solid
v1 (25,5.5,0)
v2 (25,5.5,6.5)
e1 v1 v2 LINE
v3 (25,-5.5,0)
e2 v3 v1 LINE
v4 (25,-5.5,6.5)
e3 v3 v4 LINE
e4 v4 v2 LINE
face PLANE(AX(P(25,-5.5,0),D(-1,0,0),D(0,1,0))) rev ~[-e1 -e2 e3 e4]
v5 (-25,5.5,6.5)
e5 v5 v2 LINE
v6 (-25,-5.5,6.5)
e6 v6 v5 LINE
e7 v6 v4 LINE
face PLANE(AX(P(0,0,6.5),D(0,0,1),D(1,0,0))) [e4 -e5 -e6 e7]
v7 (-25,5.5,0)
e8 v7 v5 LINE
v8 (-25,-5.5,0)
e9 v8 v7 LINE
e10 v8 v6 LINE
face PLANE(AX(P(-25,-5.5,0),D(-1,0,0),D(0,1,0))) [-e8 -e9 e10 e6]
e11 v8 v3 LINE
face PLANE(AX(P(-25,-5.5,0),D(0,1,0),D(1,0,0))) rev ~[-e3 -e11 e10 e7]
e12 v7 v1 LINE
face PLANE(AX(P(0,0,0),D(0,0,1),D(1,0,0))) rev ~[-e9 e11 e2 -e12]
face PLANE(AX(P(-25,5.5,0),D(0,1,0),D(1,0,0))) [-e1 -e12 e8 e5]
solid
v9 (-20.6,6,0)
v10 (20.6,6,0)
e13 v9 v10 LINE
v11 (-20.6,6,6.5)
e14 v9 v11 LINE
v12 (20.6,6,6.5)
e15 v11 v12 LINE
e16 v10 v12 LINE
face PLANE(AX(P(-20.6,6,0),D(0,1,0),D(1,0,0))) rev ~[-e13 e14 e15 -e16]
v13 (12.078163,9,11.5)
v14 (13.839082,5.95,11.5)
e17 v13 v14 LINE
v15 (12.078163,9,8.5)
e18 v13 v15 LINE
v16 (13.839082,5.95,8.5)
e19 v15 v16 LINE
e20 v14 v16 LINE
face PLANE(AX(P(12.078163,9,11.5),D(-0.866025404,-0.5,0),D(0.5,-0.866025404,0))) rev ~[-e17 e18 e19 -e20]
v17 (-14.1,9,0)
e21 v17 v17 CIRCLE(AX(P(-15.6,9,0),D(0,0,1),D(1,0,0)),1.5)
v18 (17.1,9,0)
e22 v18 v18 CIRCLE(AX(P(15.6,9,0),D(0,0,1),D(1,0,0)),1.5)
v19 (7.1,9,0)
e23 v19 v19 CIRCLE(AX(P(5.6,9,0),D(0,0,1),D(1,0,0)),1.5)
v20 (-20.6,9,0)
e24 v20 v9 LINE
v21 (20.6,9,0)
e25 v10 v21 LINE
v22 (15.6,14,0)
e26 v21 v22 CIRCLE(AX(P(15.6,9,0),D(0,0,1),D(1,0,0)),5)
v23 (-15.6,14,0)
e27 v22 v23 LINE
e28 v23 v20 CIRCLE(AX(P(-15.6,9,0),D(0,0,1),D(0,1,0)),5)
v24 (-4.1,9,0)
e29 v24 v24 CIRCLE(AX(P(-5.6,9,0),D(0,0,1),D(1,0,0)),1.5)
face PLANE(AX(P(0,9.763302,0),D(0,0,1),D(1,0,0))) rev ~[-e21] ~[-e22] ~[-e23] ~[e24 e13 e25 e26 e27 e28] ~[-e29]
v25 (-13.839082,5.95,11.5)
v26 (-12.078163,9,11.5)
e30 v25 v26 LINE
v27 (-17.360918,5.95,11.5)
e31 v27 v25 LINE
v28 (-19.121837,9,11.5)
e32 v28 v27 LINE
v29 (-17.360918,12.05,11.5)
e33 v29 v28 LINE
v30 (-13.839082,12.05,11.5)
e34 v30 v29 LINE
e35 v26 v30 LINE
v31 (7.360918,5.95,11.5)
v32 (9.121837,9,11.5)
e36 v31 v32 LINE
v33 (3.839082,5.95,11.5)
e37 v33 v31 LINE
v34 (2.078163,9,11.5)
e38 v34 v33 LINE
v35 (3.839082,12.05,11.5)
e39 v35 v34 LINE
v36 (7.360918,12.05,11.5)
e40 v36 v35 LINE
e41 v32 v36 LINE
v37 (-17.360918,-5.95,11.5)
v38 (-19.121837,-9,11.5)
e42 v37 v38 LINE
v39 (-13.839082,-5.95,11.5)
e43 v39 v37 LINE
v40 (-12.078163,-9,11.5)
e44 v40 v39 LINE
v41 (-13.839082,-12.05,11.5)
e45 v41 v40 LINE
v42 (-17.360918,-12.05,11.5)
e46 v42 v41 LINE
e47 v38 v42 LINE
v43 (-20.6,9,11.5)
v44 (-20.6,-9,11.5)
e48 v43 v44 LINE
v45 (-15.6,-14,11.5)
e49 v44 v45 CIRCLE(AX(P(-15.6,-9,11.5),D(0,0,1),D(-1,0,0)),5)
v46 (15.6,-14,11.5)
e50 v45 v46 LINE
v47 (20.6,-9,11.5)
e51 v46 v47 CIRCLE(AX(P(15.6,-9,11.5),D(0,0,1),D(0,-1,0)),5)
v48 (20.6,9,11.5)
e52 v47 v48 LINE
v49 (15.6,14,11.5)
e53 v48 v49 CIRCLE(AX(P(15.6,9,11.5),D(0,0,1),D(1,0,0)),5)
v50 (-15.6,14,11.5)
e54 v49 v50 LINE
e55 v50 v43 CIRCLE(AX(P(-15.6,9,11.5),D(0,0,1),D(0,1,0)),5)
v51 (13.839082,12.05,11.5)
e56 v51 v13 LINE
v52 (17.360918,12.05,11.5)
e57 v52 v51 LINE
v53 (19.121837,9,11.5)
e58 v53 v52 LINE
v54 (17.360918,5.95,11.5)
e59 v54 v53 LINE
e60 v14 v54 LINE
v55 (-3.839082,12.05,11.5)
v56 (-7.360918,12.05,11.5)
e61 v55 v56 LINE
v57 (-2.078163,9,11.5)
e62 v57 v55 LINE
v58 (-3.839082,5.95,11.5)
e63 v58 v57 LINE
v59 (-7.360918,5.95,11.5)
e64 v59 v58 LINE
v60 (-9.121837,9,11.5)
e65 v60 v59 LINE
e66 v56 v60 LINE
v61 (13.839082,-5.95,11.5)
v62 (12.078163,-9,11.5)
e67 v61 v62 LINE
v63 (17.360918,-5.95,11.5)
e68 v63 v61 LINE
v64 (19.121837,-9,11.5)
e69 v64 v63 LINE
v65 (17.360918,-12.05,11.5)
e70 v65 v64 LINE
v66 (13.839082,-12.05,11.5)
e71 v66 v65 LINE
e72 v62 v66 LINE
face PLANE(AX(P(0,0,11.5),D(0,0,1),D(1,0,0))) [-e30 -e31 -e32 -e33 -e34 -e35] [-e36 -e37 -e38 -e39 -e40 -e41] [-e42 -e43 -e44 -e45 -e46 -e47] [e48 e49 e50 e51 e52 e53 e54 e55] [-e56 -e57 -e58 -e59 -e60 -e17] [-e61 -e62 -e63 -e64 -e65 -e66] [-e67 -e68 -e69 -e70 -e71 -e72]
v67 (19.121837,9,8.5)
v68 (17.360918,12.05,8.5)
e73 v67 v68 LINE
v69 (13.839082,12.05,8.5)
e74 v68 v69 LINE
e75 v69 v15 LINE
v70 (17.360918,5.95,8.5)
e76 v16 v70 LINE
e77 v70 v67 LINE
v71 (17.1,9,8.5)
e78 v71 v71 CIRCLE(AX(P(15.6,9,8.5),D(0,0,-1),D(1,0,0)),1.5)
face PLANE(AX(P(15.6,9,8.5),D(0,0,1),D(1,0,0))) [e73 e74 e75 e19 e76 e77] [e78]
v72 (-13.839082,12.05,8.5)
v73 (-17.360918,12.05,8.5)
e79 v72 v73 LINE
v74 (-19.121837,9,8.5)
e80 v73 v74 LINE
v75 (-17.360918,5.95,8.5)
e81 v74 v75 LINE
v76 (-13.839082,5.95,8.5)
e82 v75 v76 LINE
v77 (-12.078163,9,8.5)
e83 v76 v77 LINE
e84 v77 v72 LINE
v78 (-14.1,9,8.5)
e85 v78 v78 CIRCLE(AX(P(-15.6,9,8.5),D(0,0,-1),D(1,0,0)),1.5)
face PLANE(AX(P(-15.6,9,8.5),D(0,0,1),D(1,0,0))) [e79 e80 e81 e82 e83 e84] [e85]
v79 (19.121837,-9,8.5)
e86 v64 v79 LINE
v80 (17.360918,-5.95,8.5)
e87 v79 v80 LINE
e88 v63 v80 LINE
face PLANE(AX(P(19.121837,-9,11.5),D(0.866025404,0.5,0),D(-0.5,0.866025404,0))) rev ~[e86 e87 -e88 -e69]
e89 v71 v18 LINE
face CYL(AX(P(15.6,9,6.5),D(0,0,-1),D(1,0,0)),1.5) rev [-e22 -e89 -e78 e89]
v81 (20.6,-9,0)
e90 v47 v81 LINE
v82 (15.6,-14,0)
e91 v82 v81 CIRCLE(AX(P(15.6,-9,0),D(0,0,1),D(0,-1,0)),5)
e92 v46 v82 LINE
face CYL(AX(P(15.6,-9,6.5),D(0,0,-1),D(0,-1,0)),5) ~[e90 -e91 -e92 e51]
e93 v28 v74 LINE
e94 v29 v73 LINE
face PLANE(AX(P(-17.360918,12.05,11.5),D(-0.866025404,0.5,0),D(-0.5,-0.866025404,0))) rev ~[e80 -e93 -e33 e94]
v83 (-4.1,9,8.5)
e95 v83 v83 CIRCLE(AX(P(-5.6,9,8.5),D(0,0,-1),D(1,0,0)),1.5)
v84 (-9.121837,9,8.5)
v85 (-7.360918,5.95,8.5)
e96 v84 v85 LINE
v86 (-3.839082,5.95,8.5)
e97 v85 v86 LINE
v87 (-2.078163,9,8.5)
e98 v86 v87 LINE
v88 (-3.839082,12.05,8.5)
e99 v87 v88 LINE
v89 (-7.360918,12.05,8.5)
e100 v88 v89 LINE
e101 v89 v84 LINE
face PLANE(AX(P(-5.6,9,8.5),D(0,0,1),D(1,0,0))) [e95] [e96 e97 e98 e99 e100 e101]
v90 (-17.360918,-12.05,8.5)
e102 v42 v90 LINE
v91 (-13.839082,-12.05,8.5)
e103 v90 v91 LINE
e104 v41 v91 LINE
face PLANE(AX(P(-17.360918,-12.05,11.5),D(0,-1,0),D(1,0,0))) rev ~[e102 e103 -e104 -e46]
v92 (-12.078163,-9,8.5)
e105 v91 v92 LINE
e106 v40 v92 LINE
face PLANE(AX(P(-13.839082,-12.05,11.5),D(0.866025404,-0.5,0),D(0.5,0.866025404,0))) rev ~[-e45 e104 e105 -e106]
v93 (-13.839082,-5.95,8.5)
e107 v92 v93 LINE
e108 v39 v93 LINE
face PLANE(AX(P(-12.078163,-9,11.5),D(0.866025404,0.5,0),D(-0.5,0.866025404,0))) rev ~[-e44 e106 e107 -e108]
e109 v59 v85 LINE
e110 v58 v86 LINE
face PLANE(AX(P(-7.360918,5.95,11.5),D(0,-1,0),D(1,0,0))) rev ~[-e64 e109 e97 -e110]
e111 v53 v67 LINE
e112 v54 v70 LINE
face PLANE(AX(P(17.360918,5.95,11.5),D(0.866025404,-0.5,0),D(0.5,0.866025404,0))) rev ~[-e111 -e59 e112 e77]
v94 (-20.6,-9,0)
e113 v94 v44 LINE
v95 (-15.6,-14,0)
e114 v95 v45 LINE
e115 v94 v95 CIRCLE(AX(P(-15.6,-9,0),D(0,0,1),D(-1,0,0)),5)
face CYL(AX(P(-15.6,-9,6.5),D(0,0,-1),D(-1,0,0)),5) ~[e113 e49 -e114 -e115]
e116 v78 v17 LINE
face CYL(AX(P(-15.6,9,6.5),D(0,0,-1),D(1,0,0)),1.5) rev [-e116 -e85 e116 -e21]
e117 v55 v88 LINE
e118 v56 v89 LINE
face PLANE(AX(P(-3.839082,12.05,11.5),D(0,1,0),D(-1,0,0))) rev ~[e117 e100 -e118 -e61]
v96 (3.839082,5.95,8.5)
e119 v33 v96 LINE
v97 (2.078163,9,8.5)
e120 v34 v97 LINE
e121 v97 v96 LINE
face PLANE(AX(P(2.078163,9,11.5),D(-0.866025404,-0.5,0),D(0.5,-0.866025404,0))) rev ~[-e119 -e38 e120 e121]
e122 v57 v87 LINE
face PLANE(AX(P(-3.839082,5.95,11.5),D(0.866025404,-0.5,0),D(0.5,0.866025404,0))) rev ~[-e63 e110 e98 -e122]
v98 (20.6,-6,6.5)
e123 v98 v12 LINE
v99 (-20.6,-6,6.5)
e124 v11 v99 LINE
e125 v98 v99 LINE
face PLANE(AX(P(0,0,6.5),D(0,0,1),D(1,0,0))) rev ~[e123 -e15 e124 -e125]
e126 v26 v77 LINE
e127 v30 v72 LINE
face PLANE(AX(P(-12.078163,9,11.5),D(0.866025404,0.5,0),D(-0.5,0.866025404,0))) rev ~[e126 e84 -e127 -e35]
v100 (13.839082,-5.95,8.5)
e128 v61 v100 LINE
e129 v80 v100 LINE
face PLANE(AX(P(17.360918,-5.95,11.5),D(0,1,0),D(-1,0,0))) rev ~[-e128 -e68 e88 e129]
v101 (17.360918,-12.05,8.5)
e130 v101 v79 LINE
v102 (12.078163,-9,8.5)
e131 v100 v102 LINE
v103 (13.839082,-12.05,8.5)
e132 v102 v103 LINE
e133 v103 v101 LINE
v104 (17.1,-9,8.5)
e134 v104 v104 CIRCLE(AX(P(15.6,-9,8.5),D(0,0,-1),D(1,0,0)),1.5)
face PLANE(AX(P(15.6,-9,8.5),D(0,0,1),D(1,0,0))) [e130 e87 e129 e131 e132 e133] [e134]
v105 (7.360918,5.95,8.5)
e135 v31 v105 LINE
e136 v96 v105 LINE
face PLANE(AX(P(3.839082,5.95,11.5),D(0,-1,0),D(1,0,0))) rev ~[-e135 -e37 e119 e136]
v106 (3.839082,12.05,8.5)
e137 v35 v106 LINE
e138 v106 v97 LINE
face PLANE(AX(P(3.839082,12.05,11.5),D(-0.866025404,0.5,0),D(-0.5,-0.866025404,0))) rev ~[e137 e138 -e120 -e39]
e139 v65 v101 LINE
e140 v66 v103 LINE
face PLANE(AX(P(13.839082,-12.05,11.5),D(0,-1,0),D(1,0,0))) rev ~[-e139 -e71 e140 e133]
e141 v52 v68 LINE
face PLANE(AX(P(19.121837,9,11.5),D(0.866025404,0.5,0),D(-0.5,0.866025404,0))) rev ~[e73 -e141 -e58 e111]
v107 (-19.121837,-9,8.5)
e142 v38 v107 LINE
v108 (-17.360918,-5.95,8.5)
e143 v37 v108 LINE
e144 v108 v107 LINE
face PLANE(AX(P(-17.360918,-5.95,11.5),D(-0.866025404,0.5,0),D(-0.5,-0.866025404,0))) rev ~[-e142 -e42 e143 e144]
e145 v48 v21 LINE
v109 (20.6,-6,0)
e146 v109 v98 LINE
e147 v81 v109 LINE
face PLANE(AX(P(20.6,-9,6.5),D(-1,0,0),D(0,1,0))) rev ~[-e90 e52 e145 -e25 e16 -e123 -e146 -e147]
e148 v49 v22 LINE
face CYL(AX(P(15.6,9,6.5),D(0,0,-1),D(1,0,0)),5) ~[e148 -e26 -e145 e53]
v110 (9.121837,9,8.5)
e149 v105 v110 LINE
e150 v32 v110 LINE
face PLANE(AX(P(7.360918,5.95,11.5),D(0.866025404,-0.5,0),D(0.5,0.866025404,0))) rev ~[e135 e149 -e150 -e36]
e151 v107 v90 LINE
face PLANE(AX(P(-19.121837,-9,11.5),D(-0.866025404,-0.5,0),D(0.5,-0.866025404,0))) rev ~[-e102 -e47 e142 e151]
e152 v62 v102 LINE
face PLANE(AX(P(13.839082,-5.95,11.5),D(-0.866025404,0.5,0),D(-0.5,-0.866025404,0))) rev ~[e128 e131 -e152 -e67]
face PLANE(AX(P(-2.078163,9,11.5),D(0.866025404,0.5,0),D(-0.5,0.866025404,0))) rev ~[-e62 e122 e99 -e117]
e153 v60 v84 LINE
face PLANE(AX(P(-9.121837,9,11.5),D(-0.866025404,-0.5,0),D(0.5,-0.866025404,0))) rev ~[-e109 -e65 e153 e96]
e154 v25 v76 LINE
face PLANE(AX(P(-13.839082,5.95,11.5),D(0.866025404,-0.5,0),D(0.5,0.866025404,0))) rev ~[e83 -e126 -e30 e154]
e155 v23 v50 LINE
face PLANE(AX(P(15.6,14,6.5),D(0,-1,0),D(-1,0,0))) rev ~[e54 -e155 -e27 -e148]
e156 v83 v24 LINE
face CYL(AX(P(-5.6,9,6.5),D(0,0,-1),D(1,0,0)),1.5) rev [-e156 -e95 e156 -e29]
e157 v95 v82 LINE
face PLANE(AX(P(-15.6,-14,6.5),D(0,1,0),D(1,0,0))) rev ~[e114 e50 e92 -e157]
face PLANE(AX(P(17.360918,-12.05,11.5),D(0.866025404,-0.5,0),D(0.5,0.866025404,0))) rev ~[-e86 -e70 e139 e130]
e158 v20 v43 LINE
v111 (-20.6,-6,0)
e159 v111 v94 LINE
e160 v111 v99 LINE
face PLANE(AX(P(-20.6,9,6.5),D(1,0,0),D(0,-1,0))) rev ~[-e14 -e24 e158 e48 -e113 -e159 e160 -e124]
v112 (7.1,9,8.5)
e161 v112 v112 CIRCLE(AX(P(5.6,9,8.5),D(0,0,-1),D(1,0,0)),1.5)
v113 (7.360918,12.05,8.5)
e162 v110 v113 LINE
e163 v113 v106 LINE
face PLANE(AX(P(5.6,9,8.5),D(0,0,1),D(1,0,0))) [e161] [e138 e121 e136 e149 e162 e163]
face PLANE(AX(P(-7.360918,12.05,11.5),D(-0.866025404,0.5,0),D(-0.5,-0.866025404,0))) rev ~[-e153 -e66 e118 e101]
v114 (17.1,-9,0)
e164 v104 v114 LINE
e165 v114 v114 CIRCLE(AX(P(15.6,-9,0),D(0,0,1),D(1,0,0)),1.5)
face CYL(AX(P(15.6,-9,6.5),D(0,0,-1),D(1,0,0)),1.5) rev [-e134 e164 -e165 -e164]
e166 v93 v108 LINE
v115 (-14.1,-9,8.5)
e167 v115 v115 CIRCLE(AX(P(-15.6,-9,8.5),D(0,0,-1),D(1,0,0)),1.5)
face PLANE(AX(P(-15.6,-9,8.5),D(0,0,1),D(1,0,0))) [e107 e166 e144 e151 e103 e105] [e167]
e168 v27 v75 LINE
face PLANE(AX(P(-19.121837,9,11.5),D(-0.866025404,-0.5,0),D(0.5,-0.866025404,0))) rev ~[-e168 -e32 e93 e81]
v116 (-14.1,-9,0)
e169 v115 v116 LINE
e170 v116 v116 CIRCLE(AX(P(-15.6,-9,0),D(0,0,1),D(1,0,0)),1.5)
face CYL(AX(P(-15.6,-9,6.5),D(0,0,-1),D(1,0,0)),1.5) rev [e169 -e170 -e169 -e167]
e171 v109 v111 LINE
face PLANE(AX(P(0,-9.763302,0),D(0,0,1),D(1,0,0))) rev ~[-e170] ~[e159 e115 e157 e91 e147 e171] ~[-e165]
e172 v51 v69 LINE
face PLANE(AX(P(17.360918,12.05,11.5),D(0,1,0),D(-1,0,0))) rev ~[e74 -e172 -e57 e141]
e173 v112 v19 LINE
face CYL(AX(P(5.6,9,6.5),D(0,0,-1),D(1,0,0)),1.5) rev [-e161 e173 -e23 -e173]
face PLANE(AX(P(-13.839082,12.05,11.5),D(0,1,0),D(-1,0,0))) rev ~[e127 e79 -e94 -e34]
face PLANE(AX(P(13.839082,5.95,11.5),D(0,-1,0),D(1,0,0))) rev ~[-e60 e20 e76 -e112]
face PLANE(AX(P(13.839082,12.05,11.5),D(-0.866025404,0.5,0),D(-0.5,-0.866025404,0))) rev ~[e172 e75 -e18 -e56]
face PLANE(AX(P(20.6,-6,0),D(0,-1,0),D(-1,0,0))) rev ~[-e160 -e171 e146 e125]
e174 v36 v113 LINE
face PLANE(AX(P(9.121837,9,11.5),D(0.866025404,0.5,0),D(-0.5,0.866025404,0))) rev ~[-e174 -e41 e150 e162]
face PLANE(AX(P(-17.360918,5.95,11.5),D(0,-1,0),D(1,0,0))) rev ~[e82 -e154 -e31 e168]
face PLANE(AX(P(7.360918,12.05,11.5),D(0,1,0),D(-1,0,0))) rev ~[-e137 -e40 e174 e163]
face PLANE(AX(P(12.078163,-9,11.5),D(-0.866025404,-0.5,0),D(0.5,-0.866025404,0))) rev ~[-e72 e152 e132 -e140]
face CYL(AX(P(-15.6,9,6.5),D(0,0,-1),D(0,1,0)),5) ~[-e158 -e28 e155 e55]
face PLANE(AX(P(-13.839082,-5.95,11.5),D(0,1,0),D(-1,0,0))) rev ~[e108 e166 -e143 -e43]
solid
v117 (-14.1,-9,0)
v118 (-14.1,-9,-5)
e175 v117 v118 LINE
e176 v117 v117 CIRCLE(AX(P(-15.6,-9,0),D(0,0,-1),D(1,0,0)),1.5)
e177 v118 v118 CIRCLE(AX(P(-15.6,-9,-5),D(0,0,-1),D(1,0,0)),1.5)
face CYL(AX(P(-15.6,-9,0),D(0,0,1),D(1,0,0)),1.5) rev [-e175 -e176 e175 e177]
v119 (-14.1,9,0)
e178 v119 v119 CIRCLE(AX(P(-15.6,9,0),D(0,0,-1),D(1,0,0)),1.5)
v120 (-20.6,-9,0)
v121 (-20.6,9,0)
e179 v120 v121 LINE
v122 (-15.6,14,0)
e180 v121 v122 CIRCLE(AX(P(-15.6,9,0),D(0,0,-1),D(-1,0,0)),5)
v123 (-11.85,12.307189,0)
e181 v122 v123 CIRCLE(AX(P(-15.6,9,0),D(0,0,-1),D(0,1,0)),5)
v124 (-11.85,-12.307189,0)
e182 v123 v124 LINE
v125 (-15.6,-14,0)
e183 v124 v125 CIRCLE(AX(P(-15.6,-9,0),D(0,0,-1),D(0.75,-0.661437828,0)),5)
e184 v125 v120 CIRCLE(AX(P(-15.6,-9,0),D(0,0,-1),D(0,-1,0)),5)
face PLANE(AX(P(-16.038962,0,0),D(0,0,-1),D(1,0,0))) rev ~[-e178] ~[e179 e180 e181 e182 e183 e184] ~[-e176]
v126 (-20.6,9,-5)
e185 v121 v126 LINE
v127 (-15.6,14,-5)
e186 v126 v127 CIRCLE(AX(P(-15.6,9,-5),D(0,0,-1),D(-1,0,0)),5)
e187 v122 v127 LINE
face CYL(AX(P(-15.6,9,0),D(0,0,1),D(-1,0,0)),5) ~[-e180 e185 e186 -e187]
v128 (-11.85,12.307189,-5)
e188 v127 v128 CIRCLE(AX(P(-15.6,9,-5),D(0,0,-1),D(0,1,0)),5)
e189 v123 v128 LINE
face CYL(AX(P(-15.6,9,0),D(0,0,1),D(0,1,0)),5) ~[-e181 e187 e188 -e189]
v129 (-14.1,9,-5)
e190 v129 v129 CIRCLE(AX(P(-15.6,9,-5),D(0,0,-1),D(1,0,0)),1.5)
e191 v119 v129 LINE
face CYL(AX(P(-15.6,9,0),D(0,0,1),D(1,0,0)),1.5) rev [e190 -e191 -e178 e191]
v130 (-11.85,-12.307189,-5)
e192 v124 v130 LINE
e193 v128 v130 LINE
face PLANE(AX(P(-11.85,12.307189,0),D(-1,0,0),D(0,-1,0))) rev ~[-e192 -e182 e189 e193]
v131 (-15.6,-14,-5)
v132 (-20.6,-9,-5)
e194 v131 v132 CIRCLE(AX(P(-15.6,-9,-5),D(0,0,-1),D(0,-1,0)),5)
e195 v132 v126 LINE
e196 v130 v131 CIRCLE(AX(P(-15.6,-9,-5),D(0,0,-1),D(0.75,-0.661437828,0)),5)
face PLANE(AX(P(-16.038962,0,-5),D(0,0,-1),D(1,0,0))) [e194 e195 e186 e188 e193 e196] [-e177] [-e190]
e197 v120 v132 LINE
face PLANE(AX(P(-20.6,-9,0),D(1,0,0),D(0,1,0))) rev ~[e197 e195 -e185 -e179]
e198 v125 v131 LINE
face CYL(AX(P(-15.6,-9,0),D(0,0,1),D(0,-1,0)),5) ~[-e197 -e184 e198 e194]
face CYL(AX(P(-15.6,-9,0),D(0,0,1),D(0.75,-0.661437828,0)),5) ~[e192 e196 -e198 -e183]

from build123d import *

# Parameters (mm, degrees)
F0_W     = 50
F0_H     = 11
F1_DEPTH = 6.5
F2_R     = 1.5
F3_DEPTH = 6.5
F4_R     = 1.5
F5_DEPTH = 5
F6_R     = 1.5
F7_DEPTH = 5
F9_DEPTH = 3


with BuildPart() as f1:
    # F0 (on Top) → F1 (new body)
    with BuildSketch(Plane.XY):
        Rectangle(F0_W, F0_H)
    extrude(amount=F1_DEPTH)


with BuildPart() as f3:
    # F2 (on Top) → F3 (new body)
    with BuildSketch(Plane.XY):
        with BuildLine():
            Line((15.6, 14), (0, 14))
            Line((0, 14), (-15.6, 14))
            ThreePointArc((-15.6, 14), (-19.1355339059, 12.5355339059), (-20.6, 9))
            Line((-20.6, 9), (-20.6, 6))
            Line((-20.6, 6), (0, 6))
            Line((0, 6), (20.6, 6))
            Line((20.6, 6), (20.6, 9))
            ThreePointArc((20.6, 9), (19.1355339059, 12.5355339059), (15.6, 14))
        make_face()
        with Locations((-15.6, 9)):
            Circle(F2_R, mode=Mode.SUBTRACT)
        with Locations((-5.6, 9)):
            Circle(F2_R, mode=Mode.SUBTRACT)
        with Locations((5.6, 9)):
            Circle(F2_R, mode=Mode.SUBTRACT)
        with Locations((15.6, 9)):
            Circle(F2_R, mode=Mode.SUBTRACT)
    extrude(amount=F3_DEPTH)



with BuildPart() as f3b:
    # F2 (on Top) → F3, piece 2 (new body)
    with BuildSketch(Plane.XY):
        with BuildLine():
            Line((0, -6), (-20.6, -6))
            Line((-20.6, -6), (-20.6, -9))
            ThreePointArc((-20.6, -9), (-19.1355339059, -12.5355339059), (-15.6, -14))
            Line((-15.6, -14), (0, -14))
            Line((0, -14), (15.6, -14))
            ThreePointArc((15.6, -14), (19.1355339059, -12.5355339059), (20.6, -9))
            Line((20.6, -9), (20.6, -6))
            Line((20.6, -6), (0, -6))
        make_face()
        with Locations((-15.6, -9)):
            Circle(F2_R, mode=Mode.SUBTRACT)
        with Locations((15.6, -9)):
            Circle(F2_R, mode=Mode.SUBTRACT)
    extrude(amount=F3_DEPTH)


with BuildPart() as f3_1:
    add(f3.part)

    add(f3b.part)  # F5 merges F3b
    # F4 (on face) → F5 (join)
    with BuildSketch(Plane.XY.offset(6.5)):
        with BuildLine():
            Line((15.6, 14), (0, 14))
            Line((0, 14), (-15.6, 14))
            ThreePointArc((-15.6, 14), (-19.1355339059, 12.5355339059), (-20.6, 9))
            Line((-20.6, 9), (-20.6, -9))
            ThreePointArc((-20.6, -9), (-19.1355339059, -12.5355339059), (-15.6, -14))
            Line((-15.6, -14), (0, -14))
            Line((0, -14), (15.6, -14))
            ThreePointArc((15.6, -14), (19.1355339059, -12.5355339059), (20.6, -9))
            Line((20.6, -9), (20.6, 9))
            ThreePointArc((20.6, 9), (19.1355339059, 12.5355339059), (15.6, 14))
        make_face()
        with Locations((-15.6, -9)):
            Circle(F4_R, mode=Mode.SUBTRACT)
        with Locations((15.6, -9)):
            Circle(F4_R, mode=Mode.SUBTRACT)
        with Locations((-15.6, 9)):
            Circle(F4_R, mode=Mode.SUBTRACT)
        with Locations((-5.6, 9)):
            Circle(F4_R, mode=Mode.SUBTRACT)
        with Locations((5.6, 9)):
            Circle(F4_R, mode=Mode.SUBTRACT)
        with Locations((15.6, 9)):
            Circle(F4_R, mode=Mode.SUBTRACT)
    extrude(amount=F5_DEPTH)

    # F8 (on face) → F9 (cut)
    with BuildSketch(Plane.XY.offset(11.5)):
        Polygon((-13.839081679, 12.05), (-17.360918321, 12.05), (-19.1218366421, 9), (-17.360918321, 5.95), (-13.839081679, 5.95), (-12.0781633579, 9), align=None)
        Polygon((17.360918321, 5.95), (19.1218366421, 9), (17.360918321, 12.05), (13.839081679, 12.05), (12.0781633579, 9), (13.839081679, 5.95), align=None)
        Polygon((-19.1218366421, -9), (-17.360918321, -12.05), (-13.839081679, -12.05), (-12.0781633579, -9), (-13.839081679, -5.95), (-17.360918321, -5.95), align=None)
        Polygon((13.839081679, -12.05), (17.360918321, -12.05), (19.1218366421, -9), (17.360918321, -5.95), (13.839081679, -5.95), (12.0781633579, -9), align=None)
        Polygon((-2.0781633579, 9), (-3.839081679, 12.05), (-7.360918321, 12.05), (-9.1218366421, 9), (-7.360918321, 5.95), (-3.839081679, 5.95), align=None)
        Polygon((3.839081679, 5.95), (7.360918321, 5.95), (9.1218366421, 9), (7.360918321, 12.05), (3.839081679, 12.05), (2.0781633579, 9), align=None)
    extrude(amount=-F9_DEPTH, mode=Mode.SUBTRACT)


with BuildPart() as f7:
    # F6 (on face) → F7 (new body)
    with BuildSketch(Plane(origin=(0, 0, 0), x_dir=(1, 0, 0), z_dir=(0, 0, -1))):
        with BuildLine():
            ThreePointArc((-15.6, 14), (-19.1355339059, 12.5355339059), (-20.6, 9))
            Line((-20.6, 9), (-20.6, 0))
            Line((-20.6, 0), (-20.6, -9))
            ThreePointArc((-20.6, -9), (-19.1355339059, -12.5355339059), (-15.6, -14))
            ThreePointArc((-15.6, -14), (-13.5428108612, -13.5571891388), (-11.85, -12.3071891388))
            Line((-11.85, -12.3071891388), (-11.85, 9))
            Line((-11.85, 9), (-11.85, 12.3071891388))
            ThreePointArc((-11.85, 12.3071891388), (-13.5428108612, 13.5571891388), (-15.6, 14))
        make_face()
        with Locations((-15.6, -9)):
            Circle(F6_R, mode=Mode.SUBTRACT)
        with Locations((-15.6, 9)):
            Circle(F6_R, mode=Mode.SUBTRACT)
    extrude(amount=F7_DEPTH)


solid = Compound([f1.part, f3_1.part, f7.part])
